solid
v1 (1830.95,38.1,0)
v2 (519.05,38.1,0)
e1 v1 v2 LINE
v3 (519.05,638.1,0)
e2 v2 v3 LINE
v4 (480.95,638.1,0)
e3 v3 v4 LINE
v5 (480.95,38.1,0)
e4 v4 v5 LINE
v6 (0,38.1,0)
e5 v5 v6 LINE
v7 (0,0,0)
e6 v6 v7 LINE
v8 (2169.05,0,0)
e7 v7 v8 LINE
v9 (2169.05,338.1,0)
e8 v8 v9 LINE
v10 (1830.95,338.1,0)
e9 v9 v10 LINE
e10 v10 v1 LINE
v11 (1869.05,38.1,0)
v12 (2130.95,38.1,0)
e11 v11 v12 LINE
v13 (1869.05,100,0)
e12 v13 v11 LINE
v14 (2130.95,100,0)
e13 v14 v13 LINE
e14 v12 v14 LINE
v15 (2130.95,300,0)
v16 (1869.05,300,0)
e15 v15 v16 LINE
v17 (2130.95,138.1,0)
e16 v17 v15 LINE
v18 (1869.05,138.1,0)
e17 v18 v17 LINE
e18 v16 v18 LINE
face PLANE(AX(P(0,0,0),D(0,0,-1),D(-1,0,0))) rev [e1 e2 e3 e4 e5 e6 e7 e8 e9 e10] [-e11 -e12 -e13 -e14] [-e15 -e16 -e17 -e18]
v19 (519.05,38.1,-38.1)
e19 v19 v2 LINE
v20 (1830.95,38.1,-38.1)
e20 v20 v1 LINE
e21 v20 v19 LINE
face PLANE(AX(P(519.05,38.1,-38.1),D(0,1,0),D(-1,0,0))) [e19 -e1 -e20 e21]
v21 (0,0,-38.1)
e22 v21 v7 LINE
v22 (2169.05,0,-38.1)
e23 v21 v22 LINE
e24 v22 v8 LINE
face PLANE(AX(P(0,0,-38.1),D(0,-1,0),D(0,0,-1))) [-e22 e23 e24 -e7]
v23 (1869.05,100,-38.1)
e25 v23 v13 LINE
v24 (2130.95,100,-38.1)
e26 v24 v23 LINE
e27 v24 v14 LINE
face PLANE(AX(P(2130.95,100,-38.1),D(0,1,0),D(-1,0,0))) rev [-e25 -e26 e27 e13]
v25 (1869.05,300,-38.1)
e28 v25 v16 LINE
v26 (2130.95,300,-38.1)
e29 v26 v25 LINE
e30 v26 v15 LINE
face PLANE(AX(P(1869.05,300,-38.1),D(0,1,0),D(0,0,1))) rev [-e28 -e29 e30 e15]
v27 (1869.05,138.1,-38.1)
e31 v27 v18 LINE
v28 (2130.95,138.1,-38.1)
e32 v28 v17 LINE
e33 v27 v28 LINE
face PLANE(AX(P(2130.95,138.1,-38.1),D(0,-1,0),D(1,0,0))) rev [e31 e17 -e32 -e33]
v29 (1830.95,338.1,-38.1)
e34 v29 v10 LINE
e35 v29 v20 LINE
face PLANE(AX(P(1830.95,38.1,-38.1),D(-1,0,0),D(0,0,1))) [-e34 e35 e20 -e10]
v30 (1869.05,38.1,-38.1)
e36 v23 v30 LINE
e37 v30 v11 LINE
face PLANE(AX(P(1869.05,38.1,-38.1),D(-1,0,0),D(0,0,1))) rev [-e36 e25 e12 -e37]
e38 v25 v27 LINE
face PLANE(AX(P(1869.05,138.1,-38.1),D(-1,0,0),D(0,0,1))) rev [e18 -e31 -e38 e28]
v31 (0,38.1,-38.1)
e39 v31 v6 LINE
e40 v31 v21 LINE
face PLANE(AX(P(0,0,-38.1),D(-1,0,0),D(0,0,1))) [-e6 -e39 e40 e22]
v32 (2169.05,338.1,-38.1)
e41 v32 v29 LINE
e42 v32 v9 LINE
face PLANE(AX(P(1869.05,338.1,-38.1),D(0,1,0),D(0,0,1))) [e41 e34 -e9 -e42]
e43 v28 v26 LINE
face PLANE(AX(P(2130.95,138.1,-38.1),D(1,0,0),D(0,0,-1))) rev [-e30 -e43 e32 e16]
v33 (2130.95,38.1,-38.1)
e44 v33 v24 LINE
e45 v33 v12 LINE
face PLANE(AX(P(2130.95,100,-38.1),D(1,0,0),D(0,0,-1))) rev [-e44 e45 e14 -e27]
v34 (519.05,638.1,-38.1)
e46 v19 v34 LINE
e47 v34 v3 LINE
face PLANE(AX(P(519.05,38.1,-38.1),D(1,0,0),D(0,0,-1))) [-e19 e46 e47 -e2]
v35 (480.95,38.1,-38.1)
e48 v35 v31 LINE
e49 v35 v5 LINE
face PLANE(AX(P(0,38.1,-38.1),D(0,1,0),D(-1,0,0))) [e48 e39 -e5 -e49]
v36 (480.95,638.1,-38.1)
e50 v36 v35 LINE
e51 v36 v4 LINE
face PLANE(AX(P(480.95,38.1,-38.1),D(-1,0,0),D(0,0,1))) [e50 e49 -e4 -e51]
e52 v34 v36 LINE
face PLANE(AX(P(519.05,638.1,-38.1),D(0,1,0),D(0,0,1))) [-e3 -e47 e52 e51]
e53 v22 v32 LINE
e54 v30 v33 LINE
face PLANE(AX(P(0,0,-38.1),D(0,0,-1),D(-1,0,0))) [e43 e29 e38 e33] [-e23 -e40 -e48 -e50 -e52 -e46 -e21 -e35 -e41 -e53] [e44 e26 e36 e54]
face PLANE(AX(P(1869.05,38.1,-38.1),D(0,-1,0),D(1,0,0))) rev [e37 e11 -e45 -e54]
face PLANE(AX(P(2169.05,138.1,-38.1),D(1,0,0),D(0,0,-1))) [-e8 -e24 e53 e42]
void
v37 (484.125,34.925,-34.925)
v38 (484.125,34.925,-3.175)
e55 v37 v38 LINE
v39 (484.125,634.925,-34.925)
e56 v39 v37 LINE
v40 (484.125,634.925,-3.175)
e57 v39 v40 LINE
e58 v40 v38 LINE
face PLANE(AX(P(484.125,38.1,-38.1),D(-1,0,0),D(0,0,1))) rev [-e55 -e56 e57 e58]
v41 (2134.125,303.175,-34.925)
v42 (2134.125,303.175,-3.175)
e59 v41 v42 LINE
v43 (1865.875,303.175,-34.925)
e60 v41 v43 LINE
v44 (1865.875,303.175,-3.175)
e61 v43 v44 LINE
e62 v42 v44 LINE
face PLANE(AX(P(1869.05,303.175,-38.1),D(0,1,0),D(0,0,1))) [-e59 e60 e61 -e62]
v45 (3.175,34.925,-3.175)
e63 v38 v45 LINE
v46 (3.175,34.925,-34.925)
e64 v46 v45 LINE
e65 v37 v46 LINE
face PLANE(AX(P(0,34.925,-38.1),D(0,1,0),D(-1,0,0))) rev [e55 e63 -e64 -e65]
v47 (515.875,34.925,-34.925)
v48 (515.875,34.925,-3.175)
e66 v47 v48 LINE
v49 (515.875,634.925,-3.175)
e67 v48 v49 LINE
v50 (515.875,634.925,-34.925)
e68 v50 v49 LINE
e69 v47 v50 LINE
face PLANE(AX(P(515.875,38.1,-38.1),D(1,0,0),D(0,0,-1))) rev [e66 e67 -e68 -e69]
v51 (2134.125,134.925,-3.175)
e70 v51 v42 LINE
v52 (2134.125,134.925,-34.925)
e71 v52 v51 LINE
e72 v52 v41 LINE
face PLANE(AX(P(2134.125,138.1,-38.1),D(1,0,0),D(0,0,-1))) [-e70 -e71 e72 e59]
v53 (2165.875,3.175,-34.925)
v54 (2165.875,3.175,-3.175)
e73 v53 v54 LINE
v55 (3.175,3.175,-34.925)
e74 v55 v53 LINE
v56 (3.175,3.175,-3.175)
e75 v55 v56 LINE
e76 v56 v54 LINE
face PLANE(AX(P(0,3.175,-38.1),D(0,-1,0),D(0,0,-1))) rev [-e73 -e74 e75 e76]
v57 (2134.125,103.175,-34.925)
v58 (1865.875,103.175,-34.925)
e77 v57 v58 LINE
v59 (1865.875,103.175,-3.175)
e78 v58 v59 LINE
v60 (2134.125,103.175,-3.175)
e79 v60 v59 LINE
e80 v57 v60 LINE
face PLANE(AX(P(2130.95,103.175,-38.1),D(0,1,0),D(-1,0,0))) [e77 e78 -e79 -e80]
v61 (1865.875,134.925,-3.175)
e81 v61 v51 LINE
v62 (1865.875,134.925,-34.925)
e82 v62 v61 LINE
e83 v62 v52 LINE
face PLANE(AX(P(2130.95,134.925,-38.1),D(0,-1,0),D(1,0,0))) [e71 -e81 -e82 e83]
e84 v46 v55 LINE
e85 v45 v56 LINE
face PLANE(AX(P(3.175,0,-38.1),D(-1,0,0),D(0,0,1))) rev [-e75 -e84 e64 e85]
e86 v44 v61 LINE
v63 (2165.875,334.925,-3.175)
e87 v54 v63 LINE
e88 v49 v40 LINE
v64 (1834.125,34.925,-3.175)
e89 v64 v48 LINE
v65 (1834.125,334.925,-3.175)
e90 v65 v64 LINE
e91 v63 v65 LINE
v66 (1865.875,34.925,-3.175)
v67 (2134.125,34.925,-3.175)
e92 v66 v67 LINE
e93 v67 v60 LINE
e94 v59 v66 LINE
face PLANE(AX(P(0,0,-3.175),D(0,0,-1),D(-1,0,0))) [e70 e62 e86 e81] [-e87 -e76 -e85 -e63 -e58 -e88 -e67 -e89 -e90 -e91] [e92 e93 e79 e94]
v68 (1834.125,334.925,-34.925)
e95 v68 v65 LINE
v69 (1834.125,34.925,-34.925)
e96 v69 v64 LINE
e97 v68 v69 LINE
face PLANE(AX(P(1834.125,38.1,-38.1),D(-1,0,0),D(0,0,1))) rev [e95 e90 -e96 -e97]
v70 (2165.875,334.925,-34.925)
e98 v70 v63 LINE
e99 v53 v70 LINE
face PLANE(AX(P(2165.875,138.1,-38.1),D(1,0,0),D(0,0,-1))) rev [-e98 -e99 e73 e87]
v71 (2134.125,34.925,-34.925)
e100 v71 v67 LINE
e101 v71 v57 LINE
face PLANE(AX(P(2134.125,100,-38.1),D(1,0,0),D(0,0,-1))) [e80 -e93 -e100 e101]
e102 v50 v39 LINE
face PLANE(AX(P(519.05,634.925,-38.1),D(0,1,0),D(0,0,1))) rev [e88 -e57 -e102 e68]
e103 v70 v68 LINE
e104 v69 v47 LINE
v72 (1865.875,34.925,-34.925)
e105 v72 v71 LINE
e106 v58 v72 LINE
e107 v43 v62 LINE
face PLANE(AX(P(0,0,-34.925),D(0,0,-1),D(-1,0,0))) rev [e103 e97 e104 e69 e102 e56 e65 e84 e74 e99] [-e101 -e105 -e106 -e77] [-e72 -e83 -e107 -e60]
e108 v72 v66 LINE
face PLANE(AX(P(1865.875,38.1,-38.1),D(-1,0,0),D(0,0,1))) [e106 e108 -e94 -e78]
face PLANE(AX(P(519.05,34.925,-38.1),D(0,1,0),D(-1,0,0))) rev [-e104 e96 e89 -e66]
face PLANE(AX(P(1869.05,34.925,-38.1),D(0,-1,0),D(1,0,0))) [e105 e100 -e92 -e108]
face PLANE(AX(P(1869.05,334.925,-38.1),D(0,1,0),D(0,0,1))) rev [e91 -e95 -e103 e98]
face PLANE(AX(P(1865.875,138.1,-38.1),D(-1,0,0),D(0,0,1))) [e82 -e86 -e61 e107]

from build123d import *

# Parameters (mm, degrees)
SKETCH1_W            = 261.9
SKETCH1_H            = 61.9
SKETCH1_H_2          = 161.9
BOSS_EXTRUDE1_DEPTH  = 38.1
SHELL1_START         = 3.175
SHELL1_OUTLINE_W     = 31.75
SHELL1_OUTLINE_H     = 31.75
SHELL1_DEPTH         = 2162.7
SHELL1_START_2       = 1834.125
SHELL1_2_OUTLINE_W   = 31.75
SHELL1_2_OUTLINE_H   = 31.75
SHELL1_2_DEPTH       = 331.75
SHELL1_START_3       = 484.125
SHELL1_3_OUTLINE_W   = 600
SHELL1_3_OUTLINE_H   = 31.75
SHELL1_3_DEPTH       = 31.75
SHELL1_4_OUTLINE_W   = 68.25
SHELL1_4_OUTLINE_H   = 31.75
SHELL1_4_OUTLINE_W_2 = 168.25
SHELL1_4_DEPTH       = 31.75
SHELL1_START_4       = 2134.125
SHELL1_5_OUTLINE_W   = 68.25
SHELL1_5_OUTLINE_H   = 31.75
SHELL1_5_OUTLINE_W_2 = 168.25
SHELL1_5_DEPTH       = 31.75


# Read off the part's stored shape, not the designer's step: Shell1
with BuildPart() as part:
    # Sketch1 → Boss-Extrude1 (new body)
    with BuildSketch(Plane.XY):
        Polygon((0, 0), (2169.05, 0), (2169.05, 38.1), (2169.05, 138.1), (2169.05, 338.1), (1869.05, 338.1), (1830.95, 338.1), (1830.95, 38.1), (519.05, 38.1), (519.05, 638.1), (480.95, 638.1), (480.95, 38.1), (0, 38.1), align=None)
        with Locations((2000, 69.05)):
            Rectangle(SKETCH1_W, SKETCH1_H, mode=Mode.SUBTRACT)
        with Locations((2000, 219.05)):
            Rectangle(SKETCH1_W, SKETCH1_H_2, mode=Mode.SUBTRACT)
    extrude(amount=-BOSS_EXTRUDE1_DEPTH)

    # Shell1 outline → Shell1 (cut)
    with BuildSketch(Plane.YZ.offset(SHELL1_START)):
        with Locations((19.05, -19.05)):
            Rectangle(SHELL1_OUTLINE_W, SHELL1_OUTLINE_H)
    extrude(amount=SHELL1_DEPTH, mode=Mode.SUBTRACT)

    # Shell1 2 outline → Shell1 2 (cut)
    with BuildSketch(Plane.YZ.offset(SHELL1_START_2)):
        with Locations((119.05, -19.05)):
            Rectangle(SHELL1_2_OUTLINE_W, SHELL1_2_OUTLINE_H)
        with Locations((319.05, -19.05)):
            Rectangle(SHELL1_2_OUTLINE_W, SHELL1_2_OUTLINE_H)
    extrude(amount=SHELL1_2_DEPTH, mode=Mode.SUBTRACT)

    # Shell1 3 outline → Shell1 3 (cut)
    with BuildSketch(Plane.YZ.offset(SHELL1_START_3)):
        with Locations((334.925, -19.05)):
            Rectangle(SHELL1_3_OUTLINE_W, SHELL1_3_OUTLINE_H)
    extrude(amount=SHELL1_3_DEPTH, mode=Mode.SUBTRACT)

    # Shell1 4 outline → Shell1 4 (cut)
    with BuildSketch(Plane.YZ.offset(SHELL1_START_2)):
        with Locations((69.05, -19.05)):
            Rectangle(SHELL1_4_OUTLINE_W, SHELL1_4_OUTLINE_H)
        with Locations((219.05, -19.05)):
            Rectangle(SHELL1_4_OUTLINE_W_2, SHELL1_4_OUTLINE_H)
    extrude(amount=SHELL1_4_DEPTH, mode=Mode.SUBTRACT)

    # Shell1 5 outline → Shell1 5 (cut)
    with BuildSketch(Plane.YZ.offset(SHELL1_START_4)):
        with Locations((69.05, -19.05)):
            Rectangle(SHELL1_5_OUTLINE_W, SHELL1_5_OUTLINE_H)
        with Locations((219.05, -19.05)):
            Rectangle(SHELL1_5_OUTLINE_W_2, SHELL1_5_OUTLINE_H)
    extrude(amount=SHELL1_5_DEPTH, mode=Mode.SUBTRACT)


solid = part.part
